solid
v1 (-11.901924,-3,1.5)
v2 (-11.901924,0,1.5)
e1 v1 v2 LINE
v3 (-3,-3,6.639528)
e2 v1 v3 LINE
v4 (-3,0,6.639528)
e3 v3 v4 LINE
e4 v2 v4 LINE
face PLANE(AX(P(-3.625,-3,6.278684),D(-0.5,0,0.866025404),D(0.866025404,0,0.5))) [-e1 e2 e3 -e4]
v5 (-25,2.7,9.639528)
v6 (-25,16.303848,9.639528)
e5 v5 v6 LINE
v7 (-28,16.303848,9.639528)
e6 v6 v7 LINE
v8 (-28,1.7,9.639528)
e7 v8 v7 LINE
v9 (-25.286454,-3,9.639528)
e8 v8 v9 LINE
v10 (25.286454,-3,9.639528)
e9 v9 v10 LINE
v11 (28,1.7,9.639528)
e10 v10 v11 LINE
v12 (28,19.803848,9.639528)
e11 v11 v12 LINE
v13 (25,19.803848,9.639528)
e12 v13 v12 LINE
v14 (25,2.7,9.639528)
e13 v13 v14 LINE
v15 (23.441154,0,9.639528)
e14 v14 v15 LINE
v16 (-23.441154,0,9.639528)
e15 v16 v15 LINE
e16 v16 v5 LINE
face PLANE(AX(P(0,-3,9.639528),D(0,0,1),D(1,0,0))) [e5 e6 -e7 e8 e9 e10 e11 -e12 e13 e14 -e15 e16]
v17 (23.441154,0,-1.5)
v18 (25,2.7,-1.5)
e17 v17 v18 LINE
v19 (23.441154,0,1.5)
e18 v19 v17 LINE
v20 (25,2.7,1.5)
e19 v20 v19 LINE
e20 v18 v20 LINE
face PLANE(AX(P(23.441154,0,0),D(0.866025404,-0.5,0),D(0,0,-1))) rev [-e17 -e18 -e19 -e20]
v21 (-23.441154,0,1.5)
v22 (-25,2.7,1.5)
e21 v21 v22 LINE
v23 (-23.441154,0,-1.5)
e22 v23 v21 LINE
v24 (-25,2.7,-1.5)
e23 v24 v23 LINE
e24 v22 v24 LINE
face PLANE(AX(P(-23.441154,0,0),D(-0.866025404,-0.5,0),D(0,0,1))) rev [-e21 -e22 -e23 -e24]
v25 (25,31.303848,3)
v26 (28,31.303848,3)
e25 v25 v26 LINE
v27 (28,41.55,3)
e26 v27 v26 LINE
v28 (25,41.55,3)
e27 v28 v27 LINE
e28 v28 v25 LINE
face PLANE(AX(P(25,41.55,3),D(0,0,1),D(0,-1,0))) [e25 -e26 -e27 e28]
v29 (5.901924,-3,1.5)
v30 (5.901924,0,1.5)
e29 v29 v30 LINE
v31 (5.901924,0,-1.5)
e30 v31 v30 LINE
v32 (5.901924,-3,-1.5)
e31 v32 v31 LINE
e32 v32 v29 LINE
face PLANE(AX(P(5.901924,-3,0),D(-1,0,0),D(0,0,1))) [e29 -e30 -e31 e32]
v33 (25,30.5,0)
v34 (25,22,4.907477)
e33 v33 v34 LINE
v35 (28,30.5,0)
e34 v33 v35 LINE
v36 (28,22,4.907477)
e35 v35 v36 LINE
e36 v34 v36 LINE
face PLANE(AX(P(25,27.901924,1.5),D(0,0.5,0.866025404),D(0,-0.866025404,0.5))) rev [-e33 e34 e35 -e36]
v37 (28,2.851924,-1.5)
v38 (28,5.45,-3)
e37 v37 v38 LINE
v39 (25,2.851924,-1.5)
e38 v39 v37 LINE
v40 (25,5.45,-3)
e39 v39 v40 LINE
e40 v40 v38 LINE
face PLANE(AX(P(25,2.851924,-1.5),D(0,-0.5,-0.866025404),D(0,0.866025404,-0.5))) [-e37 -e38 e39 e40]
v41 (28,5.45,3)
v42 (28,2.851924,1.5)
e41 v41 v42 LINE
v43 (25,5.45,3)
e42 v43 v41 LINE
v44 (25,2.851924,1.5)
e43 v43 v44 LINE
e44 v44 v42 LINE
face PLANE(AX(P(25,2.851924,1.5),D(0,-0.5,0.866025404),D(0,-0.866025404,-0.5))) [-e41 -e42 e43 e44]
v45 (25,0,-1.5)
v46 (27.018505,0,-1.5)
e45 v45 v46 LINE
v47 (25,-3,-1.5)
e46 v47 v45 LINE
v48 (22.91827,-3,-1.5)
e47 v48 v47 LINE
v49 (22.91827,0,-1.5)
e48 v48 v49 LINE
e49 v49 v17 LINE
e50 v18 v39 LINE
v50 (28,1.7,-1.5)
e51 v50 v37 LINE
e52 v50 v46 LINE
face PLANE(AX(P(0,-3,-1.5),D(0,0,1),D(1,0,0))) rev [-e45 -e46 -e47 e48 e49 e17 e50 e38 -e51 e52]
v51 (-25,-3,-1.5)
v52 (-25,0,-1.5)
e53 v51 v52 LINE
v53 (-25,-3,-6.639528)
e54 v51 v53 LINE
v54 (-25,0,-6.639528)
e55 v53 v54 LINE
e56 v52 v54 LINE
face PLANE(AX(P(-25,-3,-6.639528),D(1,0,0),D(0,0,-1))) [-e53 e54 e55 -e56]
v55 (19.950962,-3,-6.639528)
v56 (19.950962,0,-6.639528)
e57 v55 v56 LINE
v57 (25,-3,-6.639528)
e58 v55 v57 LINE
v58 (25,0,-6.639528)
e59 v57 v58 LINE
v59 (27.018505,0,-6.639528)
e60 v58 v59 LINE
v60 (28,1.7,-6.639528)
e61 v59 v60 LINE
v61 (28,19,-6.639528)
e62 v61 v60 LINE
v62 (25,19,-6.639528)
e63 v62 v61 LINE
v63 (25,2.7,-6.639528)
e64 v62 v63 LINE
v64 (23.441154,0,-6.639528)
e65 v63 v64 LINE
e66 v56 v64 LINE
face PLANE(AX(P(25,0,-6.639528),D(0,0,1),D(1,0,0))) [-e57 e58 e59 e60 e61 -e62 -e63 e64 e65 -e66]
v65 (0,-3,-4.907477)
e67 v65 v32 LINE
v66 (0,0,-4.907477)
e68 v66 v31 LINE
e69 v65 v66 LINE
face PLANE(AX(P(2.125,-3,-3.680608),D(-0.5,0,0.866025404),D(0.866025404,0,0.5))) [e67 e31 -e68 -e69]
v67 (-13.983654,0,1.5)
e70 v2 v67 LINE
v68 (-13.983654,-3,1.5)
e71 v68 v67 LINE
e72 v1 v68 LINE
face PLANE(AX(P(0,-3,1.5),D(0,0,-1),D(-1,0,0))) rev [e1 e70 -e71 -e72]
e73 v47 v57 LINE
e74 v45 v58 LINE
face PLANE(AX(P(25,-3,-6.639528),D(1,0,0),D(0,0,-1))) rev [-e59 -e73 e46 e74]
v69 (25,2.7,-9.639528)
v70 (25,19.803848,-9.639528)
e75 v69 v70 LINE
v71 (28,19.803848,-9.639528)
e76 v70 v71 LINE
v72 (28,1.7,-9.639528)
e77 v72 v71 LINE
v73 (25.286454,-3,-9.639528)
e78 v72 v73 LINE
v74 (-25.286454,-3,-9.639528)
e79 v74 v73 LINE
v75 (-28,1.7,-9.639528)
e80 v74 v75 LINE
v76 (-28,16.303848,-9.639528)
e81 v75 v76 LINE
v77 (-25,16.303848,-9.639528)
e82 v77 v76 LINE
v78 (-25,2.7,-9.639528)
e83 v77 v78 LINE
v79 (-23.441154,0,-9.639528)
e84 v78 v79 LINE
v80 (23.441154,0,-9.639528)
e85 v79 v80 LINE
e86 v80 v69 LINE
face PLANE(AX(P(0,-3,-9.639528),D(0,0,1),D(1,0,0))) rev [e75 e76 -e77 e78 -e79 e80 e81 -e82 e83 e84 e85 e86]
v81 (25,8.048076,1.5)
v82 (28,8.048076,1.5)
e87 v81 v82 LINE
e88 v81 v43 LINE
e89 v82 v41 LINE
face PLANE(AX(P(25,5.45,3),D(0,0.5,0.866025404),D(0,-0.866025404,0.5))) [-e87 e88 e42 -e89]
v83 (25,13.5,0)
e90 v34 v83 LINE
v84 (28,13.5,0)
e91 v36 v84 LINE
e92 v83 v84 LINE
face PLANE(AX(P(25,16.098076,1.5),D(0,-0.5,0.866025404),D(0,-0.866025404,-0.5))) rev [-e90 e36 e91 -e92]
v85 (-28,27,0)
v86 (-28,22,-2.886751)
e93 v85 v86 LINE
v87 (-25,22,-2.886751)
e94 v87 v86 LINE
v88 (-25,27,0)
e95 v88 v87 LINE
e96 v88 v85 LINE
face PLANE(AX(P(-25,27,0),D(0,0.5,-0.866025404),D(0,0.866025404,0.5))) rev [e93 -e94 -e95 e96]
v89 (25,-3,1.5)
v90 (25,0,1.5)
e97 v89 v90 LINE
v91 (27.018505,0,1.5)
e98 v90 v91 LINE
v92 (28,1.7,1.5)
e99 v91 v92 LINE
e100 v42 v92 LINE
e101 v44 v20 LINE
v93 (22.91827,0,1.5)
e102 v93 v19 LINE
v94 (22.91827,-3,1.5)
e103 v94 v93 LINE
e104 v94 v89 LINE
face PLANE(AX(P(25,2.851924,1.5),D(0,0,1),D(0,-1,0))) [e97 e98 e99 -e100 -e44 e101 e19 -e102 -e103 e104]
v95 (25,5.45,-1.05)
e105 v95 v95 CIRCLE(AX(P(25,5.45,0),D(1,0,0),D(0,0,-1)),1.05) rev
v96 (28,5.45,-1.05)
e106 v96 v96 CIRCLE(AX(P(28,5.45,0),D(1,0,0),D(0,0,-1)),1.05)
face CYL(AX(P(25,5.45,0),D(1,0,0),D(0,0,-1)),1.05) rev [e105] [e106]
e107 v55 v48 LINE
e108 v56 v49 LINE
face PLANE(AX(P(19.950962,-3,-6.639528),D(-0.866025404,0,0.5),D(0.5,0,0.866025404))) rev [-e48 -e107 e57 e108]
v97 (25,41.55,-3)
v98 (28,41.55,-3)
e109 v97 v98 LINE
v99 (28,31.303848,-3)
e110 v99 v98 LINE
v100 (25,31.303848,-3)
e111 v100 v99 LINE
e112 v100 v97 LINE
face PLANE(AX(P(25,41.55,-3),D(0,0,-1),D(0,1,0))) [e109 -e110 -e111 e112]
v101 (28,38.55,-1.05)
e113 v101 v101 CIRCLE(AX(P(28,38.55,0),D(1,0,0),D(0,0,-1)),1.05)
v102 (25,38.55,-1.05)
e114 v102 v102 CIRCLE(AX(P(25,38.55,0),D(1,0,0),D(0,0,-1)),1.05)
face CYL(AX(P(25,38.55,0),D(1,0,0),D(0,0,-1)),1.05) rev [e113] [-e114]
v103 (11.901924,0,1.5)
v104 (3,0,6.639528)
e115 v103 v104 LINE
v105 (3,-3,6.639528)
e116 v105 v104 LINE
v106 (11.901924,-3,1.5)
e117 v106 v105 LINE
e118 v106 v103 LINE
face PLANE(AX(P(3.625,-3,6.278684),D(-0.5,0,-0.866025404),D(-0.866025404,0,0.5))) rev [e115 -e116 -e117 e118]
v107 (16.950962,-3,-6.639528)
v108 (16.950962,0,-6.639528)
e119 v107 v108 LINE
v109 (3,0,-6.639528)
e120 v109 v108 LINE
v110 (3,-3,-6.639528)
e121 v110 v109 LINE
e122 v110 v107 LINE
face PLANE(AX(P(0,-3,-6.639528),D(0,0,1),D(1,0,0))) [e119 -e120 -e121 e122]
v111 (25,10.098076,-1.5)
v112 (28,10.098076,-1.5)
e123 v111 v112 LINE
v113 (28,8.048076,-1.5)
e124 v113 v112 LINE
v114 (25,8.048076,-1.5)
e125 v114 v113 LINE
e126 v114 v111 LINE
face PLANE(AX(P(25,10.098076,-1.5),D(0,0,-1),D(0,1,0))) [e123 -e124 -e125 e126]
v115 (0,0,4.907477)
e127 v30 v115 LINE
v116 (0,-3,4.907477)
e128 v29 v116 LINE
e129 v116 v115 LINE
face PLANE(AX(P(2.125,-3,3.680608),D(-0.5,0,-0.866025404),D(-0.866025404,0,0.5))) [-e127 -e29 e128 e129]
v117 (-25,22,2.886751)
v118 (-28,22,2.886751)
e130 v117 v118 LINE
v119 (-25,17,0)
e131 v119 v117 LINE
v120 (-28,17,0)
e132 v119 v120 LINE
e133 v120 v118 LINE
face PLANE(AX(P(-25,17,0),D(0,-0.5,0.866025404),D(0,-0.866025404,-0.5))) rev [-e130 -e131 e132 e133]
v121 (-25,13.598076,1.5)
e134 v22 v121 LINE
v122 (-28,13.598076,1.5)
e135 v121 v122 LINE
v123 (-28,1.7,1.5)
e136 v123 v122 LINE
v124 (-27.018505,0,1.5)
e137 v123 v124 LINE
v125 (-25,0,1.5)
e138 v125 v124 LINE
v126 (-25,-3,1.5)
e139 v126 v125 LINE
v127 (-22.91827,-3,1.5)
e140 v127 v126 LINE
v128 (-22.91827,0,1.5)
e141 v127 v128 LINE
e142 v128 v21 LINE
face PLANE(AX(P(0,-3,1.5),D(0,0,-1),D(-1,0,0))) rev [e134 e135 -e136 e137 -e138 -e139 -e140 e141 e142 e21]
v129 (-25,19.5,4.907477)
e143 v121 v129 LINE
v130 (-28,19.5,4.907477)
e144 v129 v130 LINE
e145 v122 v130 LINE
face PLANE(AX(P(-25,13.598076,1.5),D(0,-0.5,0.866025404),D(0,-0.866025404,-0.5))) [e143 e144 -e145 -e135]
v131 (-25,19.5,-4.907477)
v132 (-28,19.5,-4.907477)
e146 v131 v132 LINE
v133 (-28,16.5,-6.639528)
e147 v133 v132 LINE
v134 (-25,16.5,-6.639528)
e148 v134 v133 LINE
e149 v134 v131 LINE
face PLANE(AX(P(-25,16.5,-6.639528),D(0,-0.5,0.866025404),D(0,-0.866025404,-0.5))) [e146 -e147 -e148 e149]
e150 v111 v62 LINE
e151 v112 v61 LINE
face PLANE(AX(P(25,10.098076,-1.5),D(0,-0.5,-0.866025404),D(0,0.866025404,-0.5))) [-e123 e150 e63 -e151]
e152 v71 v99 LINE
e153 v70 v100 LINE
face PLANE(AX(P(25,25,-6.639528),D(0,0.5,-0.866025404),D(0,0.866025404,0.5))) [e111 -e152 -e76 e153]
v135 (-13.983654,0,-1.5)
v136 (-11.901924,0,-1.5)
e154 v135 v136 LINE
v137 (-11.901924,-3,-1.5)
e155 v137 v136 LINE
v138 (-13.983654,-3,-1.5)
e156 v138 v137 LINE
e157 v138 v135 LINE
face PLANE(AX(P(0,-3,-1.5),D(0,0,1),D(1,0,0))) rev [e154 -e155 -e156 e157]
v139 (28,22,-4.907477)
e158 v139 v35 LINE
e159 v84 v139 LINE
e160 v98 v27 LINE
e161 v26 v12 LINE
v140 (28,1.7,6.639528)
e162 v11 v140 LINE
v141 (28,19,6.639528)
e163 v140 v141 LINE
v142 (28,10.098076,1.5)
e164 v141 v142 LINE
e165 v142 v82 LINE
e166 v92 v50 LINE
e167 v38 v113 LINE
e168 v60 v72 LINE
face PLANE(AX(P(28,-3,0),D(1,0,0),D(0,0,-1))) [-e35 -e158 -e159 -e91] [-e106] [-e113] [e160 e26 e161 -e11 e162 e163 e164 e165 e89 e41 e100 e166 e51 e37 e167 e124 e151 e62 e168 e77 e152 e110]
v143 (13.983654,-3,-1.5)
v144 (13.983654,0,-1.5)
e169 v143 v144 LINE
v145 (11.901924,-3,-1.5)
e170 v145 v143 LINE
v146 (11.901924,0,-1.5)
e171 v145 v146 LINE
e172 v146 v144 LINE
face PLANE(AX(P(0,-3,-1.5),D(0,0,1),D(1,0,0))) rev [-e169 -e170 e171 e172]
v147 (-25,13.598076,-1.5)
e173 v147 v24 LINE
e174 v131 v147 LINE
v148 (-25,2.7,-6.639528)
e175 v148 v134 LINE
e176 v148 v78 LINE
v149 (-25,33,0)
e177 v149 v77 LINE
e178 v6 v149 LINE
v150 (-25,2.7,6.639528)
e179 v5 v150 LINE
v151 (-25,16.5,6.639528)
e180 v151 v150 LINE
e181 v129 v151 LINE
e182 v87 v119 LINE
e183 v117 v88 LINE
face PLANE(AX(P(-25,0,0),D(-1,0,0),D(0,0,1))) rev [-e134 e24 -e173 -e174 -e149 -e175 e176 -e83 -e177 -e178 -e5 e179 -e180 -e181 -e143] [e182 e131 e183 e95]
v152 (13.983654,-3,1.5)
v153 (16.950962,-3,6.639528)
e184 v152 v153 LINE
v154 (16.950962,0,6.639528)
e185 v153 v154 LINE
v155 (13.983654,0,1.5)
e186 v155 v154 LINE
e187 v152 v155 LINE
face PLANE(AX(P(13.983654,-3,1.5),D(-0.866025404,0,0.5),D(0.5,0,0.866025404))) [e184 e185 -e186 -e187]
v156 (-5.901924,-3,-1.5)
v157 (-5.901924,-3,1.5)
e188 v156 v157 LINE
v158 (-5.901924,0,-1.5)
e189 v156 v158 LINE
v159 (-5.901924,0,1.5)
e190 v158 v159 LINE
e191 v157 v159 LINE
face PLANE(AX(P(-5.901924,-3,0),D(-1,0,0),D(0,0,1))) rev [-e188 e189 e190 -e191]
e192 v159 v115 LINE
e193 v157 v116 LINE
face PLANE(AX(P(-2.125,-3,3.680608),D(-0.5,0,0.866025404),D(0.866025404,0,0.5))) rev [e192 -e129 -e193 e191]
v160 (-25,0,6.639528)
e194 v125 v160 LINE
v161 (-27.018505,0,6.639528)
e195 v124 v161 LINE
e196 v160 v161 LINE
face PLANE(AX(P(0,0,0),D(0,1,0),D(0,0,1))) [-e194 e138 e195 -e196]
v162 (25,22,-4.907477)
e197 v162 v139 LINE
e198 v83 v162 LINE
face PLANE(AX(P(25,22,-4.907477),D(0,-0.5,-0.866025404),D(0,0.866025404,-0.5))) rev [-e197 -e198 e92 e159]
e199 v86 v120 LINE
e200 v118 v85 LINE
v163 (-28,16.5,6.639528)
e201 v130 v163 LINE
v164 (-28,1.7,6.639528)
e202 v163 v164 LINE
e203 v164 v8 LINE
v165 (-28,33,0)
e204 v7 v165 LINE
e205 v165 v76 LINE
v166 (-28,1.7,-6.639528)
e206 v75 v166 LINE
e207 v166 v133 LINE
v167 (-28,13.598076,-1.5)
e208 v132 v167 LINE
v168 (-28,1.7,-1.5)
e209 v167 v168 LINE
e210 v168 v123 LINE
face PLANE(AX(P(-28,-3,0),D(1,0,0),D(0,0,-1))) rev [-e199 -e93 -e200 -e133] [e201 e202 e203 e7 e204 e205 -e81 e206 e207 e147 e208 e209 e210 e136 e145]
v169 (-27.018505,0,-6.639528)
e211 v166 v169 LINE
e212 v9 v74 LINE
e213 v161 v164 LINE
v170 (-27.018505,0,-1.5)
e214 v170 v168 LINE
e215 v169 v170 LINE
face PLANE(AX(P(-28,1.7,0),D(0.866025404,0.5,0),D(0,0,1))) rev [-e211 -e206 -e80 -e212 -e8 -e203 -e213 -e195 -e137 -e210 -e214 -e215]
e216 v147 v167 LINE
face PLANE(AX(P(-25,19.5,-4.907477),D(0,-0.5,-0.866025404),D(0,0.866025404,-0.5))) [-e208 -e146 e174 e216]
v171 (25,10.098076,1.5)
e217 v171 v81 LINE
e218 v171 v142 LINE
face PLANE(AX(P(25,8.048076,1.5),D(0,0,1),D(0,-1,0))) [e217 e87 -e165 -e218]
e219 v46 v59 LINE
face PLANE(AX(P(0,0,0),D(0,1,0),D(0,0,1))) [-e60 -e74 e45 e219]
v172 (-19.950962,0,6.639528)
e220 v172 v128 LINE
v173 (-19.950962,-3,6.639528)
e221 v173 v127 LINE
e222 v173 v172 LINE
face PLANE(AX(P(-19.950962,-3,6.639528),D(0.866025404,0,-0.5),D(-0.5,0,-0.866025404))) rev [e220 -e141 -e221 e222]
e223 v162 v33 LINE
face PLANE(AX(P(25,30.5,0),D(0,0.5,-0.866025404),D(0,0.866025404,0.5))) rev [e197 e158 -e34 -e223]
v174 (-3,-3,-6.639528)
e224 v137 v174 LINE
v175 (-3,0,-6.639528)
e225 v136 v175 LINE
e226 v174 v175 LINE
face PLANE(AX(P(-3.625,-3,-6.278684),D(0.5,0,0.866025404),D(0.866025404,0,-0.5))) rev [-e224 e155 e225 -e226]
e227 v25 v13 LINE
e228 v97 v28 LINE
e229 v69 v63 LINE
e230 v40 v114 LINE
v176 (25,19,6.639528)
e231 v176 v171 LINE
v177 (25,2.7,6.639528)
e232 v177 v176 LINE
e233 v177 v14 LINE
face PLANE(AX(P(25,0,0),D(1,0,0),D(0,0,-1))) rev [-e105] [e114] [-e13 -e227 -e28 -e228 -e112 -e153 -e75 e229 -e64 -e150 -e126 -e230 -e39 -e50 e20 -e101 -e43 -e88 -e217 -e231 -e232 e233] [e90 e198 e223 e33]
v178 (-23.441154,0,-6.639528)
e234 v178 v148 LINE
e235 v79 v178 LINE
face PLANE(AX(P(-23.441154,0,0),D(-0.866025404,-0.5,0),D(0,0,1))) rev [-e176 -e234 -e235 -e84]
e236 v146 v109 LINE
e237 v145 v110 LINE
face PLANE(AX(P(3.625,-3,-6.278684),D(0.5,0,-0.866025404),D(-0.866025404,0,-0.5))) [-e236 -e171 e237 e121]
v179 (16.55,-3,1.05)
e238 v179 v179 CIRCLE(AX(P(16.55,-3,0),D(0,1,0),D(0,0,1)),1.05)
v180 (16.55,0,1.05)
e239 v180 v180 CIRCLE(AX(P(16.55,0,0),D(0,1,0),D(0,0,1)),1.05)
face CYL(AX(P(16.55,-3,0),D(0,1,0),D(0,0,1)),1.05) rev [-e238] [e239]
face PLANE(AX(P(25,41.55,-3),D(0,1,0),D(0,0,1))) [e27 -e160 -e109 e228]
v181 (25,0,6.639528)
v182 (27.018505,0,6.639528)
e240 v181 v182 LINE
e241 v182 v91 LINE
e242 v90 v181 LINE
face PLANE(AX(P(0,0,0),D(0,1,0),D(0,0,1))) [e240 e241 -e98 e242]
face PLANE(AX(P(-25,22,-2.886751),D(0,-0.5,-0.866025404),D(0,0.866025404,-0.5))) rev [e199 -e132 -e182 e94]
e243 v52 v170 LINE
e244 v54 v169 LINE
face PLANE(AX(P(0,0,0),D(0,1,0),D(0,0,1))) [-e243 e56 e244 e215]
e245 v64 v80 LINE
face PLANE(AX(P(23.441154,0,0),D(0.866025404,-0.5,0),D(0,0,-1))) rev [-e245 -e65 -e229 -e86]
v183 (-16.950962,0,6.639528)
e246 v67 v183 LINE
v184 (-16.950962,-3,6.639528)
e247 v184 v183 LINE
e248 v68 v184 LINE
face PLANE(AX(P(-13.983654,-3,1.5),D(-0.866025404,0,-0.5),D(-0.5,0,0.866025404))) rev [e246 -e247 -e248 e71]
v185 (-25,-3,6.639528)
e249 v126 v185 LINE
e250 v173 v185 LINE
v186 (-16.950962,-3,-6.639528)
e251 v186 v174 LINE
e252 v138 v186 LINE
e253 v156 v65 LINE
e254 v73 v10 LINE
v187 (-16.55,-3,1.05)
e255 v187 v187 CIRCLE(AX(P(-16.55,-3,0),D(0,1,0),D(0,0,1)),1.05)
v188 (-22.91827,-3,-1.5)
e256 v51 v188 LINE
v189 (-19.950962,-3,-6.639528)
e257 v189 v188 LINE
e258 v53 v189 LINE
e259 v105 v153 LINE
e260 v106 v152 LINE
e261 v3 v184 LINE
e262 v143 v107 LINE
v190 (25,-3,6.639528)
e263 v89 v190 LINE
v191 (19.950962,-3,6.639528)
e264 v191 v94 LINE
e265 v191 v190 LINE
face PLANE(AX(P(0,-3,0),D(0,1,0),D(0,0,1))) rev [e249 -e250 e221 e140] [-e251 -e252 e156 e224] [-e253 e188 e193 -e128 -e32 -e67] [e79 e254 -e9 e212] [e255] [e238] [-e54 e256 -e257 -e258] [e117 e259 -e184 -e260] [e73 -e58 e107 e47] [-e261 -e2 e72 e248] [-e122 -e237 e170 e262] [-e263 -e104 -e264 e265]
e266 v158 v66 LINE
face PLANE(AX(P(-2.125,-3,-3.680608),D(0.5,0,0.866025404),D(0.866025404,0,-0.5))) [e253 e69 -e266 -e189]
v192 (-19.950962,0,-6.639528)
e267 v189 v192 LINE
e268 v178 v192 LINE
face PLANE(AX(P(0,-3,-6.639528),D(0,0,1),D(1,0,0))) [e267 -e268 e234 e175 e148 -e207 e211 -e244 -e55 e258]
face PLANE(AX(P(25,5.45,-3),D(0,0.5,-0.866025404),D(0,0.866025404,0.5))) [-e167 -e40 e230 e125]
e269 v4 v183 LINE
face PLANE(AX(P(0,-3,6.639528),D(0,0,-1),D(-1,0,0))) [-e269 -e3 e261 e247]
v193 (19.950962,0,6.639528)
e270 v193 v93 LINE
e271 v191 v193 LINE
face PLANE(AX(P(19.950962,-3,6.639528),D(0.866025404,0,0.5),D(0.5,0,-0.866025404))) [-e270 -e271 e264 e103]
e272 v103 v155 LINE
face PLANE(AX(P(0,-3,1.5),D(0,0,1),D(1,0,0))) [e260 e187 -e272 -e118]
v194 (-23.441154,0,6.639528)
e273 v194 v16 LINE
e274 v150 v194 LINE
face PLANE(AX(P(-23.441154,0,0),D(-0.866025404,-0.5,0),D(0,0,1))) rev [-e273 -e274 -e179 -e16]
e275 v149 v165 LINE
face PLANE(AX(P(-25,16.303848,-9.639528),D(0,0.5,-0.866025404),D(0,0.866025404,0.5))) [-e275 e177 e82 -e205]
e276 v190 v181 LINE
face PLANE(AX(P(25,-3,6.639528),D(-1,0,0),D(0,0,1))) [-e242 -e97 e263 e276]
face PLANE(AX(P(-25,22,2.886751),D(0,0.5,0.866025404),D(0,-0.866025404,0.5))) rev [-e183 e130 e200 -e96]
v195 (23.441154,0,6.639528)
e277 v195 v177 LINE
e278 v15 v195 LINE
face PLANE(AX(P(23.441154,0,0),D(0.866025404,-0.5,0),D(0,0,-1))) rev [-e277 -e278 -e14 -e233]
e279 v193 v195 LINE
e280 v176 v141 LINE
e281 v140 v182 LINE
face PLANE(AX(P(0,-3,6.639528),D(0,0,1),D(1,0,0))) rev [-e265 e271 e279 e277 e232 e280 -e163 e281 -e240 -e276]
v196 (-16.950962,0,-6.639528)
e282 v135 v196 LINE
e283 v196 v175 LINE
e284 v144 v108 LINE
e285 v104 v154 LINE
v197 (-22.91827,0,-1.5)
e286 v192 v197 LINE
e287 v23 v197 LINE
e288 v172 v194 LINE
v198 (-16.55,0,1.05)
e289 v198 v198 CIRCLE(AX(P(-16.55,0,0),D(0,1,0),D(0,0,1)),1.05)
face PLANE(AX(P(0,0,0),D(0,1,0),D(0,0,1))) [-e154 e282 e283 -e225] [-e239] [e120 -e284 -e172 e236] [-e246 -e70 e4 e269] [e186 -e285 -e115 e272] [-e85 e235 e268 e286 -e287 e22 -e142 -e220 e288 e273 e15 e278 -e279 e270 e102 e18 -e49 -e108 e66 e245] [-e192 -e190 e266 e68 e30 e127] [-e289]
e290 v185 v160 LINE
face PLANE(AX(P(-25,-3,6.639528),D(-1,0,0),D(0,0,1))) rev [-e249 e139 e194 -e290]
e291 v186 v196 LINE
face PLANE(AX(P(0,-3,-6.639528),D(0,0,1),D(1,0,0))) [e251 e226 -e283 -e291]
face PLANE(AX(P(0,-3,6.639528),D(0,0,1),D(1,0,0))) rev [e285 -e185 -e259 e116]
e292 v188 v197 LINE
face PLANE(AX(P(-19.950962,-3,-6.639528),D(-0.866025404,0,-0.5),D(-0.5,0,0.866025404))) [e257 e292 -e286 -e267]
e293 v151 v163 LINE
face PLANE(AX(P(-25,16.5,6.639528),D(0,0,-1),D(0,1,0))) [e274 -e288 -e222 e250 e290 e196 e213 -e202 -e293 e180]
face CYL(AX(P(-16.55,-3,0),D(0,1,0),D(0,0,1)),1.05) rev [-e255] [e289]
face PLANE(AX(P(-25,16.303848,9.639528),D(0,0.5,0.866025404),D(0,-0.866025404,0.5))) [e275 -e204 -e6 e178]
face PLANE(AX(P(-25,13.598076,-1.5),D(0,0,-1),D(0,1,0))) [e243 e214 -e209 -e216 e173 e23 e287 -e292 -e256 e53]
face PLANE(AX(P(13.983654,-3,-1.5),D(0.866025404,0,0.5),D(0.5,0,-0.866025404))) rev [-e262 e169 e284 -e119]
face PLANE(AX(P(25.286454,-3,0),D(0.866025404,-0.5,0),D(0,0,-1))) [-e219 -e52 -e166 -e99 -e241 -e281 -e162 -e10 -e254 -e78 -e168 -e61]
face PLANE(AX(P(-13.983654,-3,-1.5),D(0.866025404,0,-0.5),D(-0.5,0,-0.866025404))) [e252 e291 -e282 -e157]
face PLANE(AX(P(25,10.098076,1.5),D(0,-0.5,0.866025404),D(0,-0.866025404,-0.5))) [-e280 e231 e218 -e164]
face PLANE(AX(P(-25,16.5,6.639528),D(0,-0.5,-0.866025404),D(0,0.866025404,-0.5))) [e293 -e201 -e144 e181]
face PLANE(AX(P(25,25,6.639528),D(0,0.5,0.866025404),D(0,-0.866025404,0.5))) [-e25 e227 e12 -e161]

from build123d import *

# Parameters (mm, degrees)
SKETCH1_R               = 1.05
BOSS_EXTRUDE1_DEPTH     = 3
SKETCH4_W               = 3
SKETCH4_H               = 5.139528096
BOSS_EXTRUDE5_DEPTH     = 3
MIRROR3_COPY_1_SKETCH_W = 3
MIRROR3_COPY_1_SKETCH_H = 5.139528096
MIRROR3_COPY_1_DEPTH    = 3
SKETCH5_R               = 1.05
BOSS_EXTRUDE6_DEPTH     = 3
CHAMFER2_SIZE           = 10
CHAMFER2_SIZE_2         = 5.773502692
BOSS_EXTRUDE8_DEPTH     = 3
CUT_EXTRUDE3_DEPTH      = 19.279056191
CHAMFER4_SIZE           = 2.7
CHAMFER4_SIZE_2         = 1.558845727
CHAMFER5_SIZE           = 2.713546265
CHAMFER5_SIZE_2         = 4.7


with BuildPart() as part:
    # Sketch1 → Boss-Extrude1 (new body)
    with BuildSketch(Plane(origin=(0, 0, 0), x_dir=(1, 0, 0), z_dir=(0, 1, 0))):
        Polygon((-28, -1.5), (-28, 1.5), (-11.901923789, 1.5), (-3, 6.639528096), (-28, 6.639528096), (-28, 9.639528096), (28, 9.639528096), (28, 6.639528096), (3, 6.639528096), (11.901923789, 1.5), (28, 1.5), (28, -1.5), (11.901923789, -1.5), (3, -6.639528096), (28, -6.639528096), (28, -9.639528096), (-28, -9.639528096), (-28, -6.639528096), (-3, -6.639528096), (-11.901923789, -1.5), align=None)
        with Locations(Location((-16.55, 0, 0), (0, 0, 270))):
            Circle(SKETCH1_R, mode=Mode.SUBTRACT)
        with Locations(Location((16.55, 0, 0), (0, 0, 270))):
            Circle(SKETCH1_R, mode=Mode.SUBTRACT)
        Polygon((-5.901923789, 1.5), (0, 4.907477288), (5.901923789, 1.5), (5.901923789, -1.5), (0, -4.907477288), (-5.901923789, -1.5), align=None, mode=Mode.SUBTRACT)
    extrude(amount=-BOSS_EXTRUDE1_DEPTH)

    # Sketch4 → Boss-Extrude5 (add)
    with BuildSketch(Plane(origin=(0, 0, 0), x_dir=(1, 0, 0), z_dir=(0, 1, 0))):
        with Locations((-26.5, 4.069764048)):
            Rectangle(SKETCH4_W, SKETCH4_H)
        Polygon((-13.983653965, 1.5), (-16.950961894, 6.639528096), (-19.950961894, 6.639528096), (-22.918269824, 1.5), align=None)
    boss_extrude5 = extrude(amount=-BOSS_EXTRUDE5_DEPTH)

    # Mirror2: Boss-Extrude5 across plane
    add(boss_extrude5.mirror(Plane.XY))

    # Mirror3: Boss-Extrude5 across plane
    add(boss_extrude5.mirror(Plane(origin=(0, 0, 0), x_dir=(0, 0, 1), z_dir=(1, 0, 0))))

    # Mirror3 copy 1 sketch → Mirror3 copy 1 (add)
    with BuildSketch(Plane(origin=(0, 0, 0), x_dir=(-1, 0, 0), z_dir=(0, 1, 0))):
        with Locations((-26.5, 4.069764048)):
            Rectangle(MIRROR3_COPY_1_SKETCH_W, MIRROR3_COPY_1_SKETCH_H)
        Polygon((-13.983653965, 1.5), (-16.950961894, 6.639528096), (-19.950961894, 6.639528096), (-22.918269824, 1.5), align=None)
    extrude(amount=-MIRROR3_COPY_1_DEPTH)

    # Sketch5 → Boss-Extrude6 (add)
    with BuildSketch(Plane(origin=(28, 0, 0), x_dir=(0, 0, -1), z_dir=(1, 0, 0))):
        Polygon((-1.5, 0), (1.5, 0), (1.5, 2.851923789), (3, 5.45), (1.5, 8.048076211), (1.5, 10.098076211), (6.639528096, 19), (6.639528096, 0), (9.639528096, 0), (9.639528096, 19.803847577), (6.639528096, 25), (3, 31.303847577), (3, 41.55), (-3, 41.55), (-3, 31.303847577), (-6.639528096, 25), (-9.639528096, 19.803847577), (-9.639528096, 0), (-6.639528096, 0), (-6.639528096, 19), (-1.5, 10.098076211), (-1.5, 8.048076211), (-3, 5.45), (-1.5, 2.851923789), align=None)
        with Locations((0, 38.55)):
            Circle(SKETCH5_R, mode=Mode.SUBTRACT)
        with Locations((0, 5.45)):
            Circle(SKETCH5_R, mode=Mode.SUBTRACT)
        Polygon((-1.5, 27.901923789), (-4.907477288, 22), (-1.5, 16.098076211), (0, 13.5), (1.5, 16.098076211), (4.907477288, 22), (1.5, 27.901923789), (0, 30.5), align=None, mode=Mode.SUBTRACT)
    extrude(amount=-BOSS_EXTRUDE6_DEPTH)

    # Chamfer2
    # the kernel refuses this chamfer: 10, 5.773502692 mm, written as the material it adds along each edge
    with BuildSketch(Plane(origin=(25, 0, 19.231329451), x_dir=(0.019326765612700636, 0.9998132206222079, 0), z_dir=(0, 0, -1))) as chamfer2_piece_1_section:
        Polygon((CHAMFER2_SIZE * 0.999813220622, -CHAMFER2_SIZE * 0.0193267656127), (-CHAMFER2_SIZE_2 * 0.0193267656124, -CHAMFER2_SIZE_2 * 0.999813220604), (0, 0), align=None)
    chamfer2_piece_1 = extrude(amount=54.741715093, mode=Mode.PRIVATE)
    chamfer2_piece_1 = split(chamfer2_piece_1, bisect_by=Plane(origin=(23.083170395, 3.339976868, 9.639528096), z_dir=(0, 0, -1)), keep=Keep.TOP, mode=Mode.PRIVATE)
    chamfer2_piece_1 = split(chamfer2_piece_1, bisect_by=Plane(origin=(23.083170395, 3.339976868, 6.639528096), z_dir=(0, 0, 1)), keep=Keep.TOP, mode=Mode.PRIVATE)
    add(chamfer2_piece_1)
    with BuildSketch(Plane(origin=(25, 0, 19.231329451), x_dir=(0.019326765612700636, 0.9998132206222079, 0), z_dir=(0, 0, -1))) as chamfer2_piece_2_section:
        Polygon((CHAMFER2_SIZE * 0.999813220622, -CHAMFER2_SIZE * 0.0193267656127), (-CHAMFER2_SIZE_2 * 0.0193267656124, -CHAMFER2_SIZE_2 * 0.999813220604), (0, 0), align=None)
    chamfer2_piece_2 = extrude(amount=54.741715093, mode=Mode.PRIVATE)
    chamfer2_piece_2 = chamfer2_piece_2 - Plane(origin=(20.16592145, 5.45, 0), x_dir=(0, 0, -1), z_dir=(1, 0, 0)) * Cylinder(1.05, 150, mode=Mode.PRIVATE)
    chamfer2_piece_2 = split(chamfer2_piece_2, bisect_by=Plane(origin=(20.36501826, 1.167335957, 5.922361434), z_dir=(-0.8660254037844365, 0, -0.5000000000000038)), keep=Keep.TOP, mode=Mode.PRIVATE)
    chamfer2_piece_2 = split(chamfer2_piece_2, bisect_by=Plane(origin=(20.16592145, 1.167335957, -1.5), z_dir=(0, 0, 1)), keep=Keep.TOP, mode=Mode.PRIVATE)
    add(chamfer2_piece_2)
    with BuildSketch(Plane(origin=(25, 0, 19.231329451), x_dir=(0.019326765612700636, 0.9998132206222079, 0), z_dir=(0, 0, -1))) as chamfer2_piece_3_section:
        Polygon((CHAMFER2_SIZE * 0.999813220622, -CHAMFER2_SIZE * 0.0193267656127), (-CHAMFER2_SIZE_2 * 0.0193267656124, -CHAMFER2_SIZE_2 * 0.999813220604), (0, 0), align=None)
    chamfer2_piece_3 = extrude(amount=54.741715093, mode=Mode.PRIVATE)
    chamfer2_piece_3 = chamfer2_piece_3 - Plane(origin=(24.384879917, 5.45, 0), x_dir=(0, 0, -1), z_dir=(1, 0, 0)) * Cylinder(1.05, 150, mode=Mode.PRIVATE)
    chamfer2_piece_3 = split(chamfer2_piece_3, bisect_by=Plane(origin=(24.384879917, 8.598015425, 1.5), z_dir=(0, 0, -1)), keep=Keep.TOP, mode=Mode.PRIVATE)
    chamfer2_piece_3 = split(chamfer2_piece_3, bisect_by=Plane(origin=(24.384879917, 8.598015425, -1.5), z_dir=(0, 0, 1)), keep=Keep.TOP, mode=Mode.PRIVATE)
    add(chamfer2_piece_3)
    with BuildSketch(Plane(origin=(25, 0, 19.231329451), x_dir=(0.019326765612700636, 0.9998132206222079, 0), z_dir=(0, 0, -1))) as chamfer2_piece_4_section:
        Polygon((CHAMFER2_SIZE * 0.999813220622, -CHAMFER2_SIZE * 0.0193267656127), (-CHAMFER2_SIZE_2 * 0.0193267656124, -CHAMFER2_SIZE_2 * 0.999813220604), (0, 0), align=None)
    chamfer2_piece_4 = extrude(amount=54.741715093, mode=Mode.PRIVATE)
    chamfer2_piece_4 = split(chamfer2_piece_4, bisect_by=Plane(origin=(22.219816408, 4.29897732, -1.5), z_dir=(0, 0, -1)), keep=Keep.TOP, mode=Mode.PRIVATE)
    chamfer2_piece_4 = split(chamfer2_piece_4, bisect_by=Plane(origin=(22.603293948, 4.29897732, -2.04555422), z_dir=(-0.8660254037844365, 0, 0.5000000000000038)), keep=Keep.TOP, mode=Mode.PRIVATE)
    add(chamfer2_piece_4)
    with BuildSketch(Plane(origin=(25, 0, -6.639528096), x_dir=(0.019326765612700636, 0.9998132206222079, 0), z_dir=(0, 0, -1))) as chamfer2_piece_5:
        Polygon((CHAMFER2_SIZE * 0.999813220622, -CHAMFER2_SIZE * 0.0193267656127), (-CHAMFER2_SIZE_2 * 0.0193267656124, -CHAMFER2_SIZE_2 * 0.999813220604), (0, 0), align=None)
    extrude(amount=3)

    # Sketch8 → Boss-Extrude8 (add)
    with BuildSketch(Plane.ZY.offset(28)):
        Polygon((0, 33), (-6.350852961, 22), (-9.639528096, 16.303847577), (-9.639528096, 0), (-6.639528096, 0), (-6.639528096, 16.5), (-4.907477288, 19.5), (-1.5, 13.598076211), (-1.5, 0), (1.5, 0), (1.5, 13.598076211), (4.907477288, 19.5), (6.639528096, 16.5), (6.639528096, 0), (9.639528096, 0), (9.639528096, 16.303847577), (6.350852961, 22), align=None)
        Polygon((0, 17), (2.886751346, 22), (0, 27), (-2.886751346, 22), align=None, mode=Mode.SUBTRACT)
    extrude(amount=-BOSS_EXTRUDE8_DEPTH)

    # Sketch11 → Cut-Extrude3 (cut)
    with BuildSketch(Plane(origin=(0, 0, -9.639528096), x_dir=(-1, 0, 0), z_dir=(0, 0, -1))):
        Polygon((-19.226497308, 0), (-25, 0), (-25, 10), align=None)
    extrude(amount=-CUT_EXTRUDE3_DEPTH, mode=Mode.SUBTRACT)

    # Chamfer4
    # the kernel refuses this chamfer: 2.7, 1.558845727 mm, written as the material it adds along each edge
    with BuildSketch(Plane(origin=(-25, 0, -0.345603442), x_dir=(-0.019326765612700168, 0.9998132206222078, 0), z_dir=(0, 0, 1))) as chamfer4_piece_1_section:
        Polygon((CHAMFER4_SIZE * 0.999813220622, -CHAMFER4_SIZE * 0.0193267656127), (-CHAMFER4_SIZE_2 * 0.0193267656104, -CHAMFER4_SIZE_2 * 0.999813220502), (0, 0), align=None)
    chamfer4_piece_1 = extrude(amount=9.985131538, mode=Mode.PRIVATE)
    chamfer4_piece_1 = split(chamfer4_piece_1, bisect_by=Plane(origin=(-24.500125104, 0.905532133, 1.5), z_dir=(0, 0, -1)), keep=Keep.TOP, mode=Mode.PRIVATE)
    add(chamfer4_piece_1)
    with BuildSketch(Plane(origin=(-25, 0, 6.639528096), x_dir=(-0.019326765612700168, 0.9998132206222078, 0), z_dir=(0, 0, 1)), Plane(origin=(-25, 0, -1.5), x_dir=(-0.019326765612700168, 0.9998132206222078, 0), z_dir=(0, 0, 1)), Plane(origin=(-25, 0, -9.639528096), x_dir=(-0.019326765612701444, 0.9998132206222078, 0), z_dir=(0, 0, 1))) as chamfer4_piece_2:
        Polygon((CHAMFER4_SIZE * 0.999813220622, -CHAMFER4_SIZE * 0.0193267656127), (-CHAMFER4_SIZE_2 * 0.0193267656104, -CHAMFER4_SIZE_2 * 0.999813220502), (0, 0), align=None)
    extrude(amount=3)
    with BuildSketch(Plane(origin=(-25, 0, -8.485131538), x_dir=(-0.019326765612700168, 0.9998132206222078, 0), z_dir=(0, 0, 1))) as chamfer4_piece_3_section:
        Polygon((CHAMFER4_SIZE * 0.999813220622, -CHAMFER4_SIZE * 0.0193267656127), (-CHAMFER4_SIZE_2 * 0.0193267656104, -CHAMFER4_SIZE_2 * 0.999813220502), (0, 0), align=None)
    chamfer4_piece_3 = extrude(amount=9.985131538, mode=Mode.PRIVATE)
    chamfer4_piece_3 = split(chamfer4_piece_3, bisect_by=Plane(origin=(-24.500125104, 0.905532133, -6.639528096), z_dir=(0, 0, -1)), keep=Keep.TOP, mode=Mode.PRIVATE)
    add(chamfer4_piece_3)
    with BuildSketch(Plane(origin=(-25, 0, -1.5), x_dir=(-0.019326765612700168, 0.9998132206222078, 0), z_dir=(0, 0, 1))) as chamfer4_piece_4_section:
        Polygon((CHAMFER4_SIZE * 0.999813220622, -CHAMFER4_SIZE * 0.0193267656127), (-CHAMFER4_SIZE_2 * 0.0193267656104, -CHAMFER4_SIZE_2 * 0.999813220502), (0, 0), align=None)
    chamfer4_piece_4 = extrude(amount=9.985131538, mode=Mode.PRIVATE)
    chamfer4_piece_4 = split(chamfer4_piece_4, bisect_by=Plane(origin=(-24.500125104, 0.905532133, 6.639528096), z_dir=(0, 0, 1)), keep=Keep.TOP, mode=Mode.PRIVATE)
    add(chamfer4_piece_4)
    with BuildSketch(Plane(origin=(-25, 0, -9.639528096), x_dir=(-0.019326765612701444, 0.9998132206222078, 0), z_dir=(0, 0, 1))) as chamfer4_piece_5_section:
        Polygon((CHAMFER4_SIZE * 0.999813220622, -CHAMFER4_SIZE * 0.0193267656127), (-CHAMFER4_SIZE_2 * 0.0193267656104, -CHAMFER4_SIZE_2 * 0.999813220502), (0, 0), align=None)
    chamfer4_piece_5 = extrude(amount=9.985131538, mode=Mode.PRIVATE)
    chamfer4_piece_5 = split(chamfer4_piece_5, bisect_by=Plane(origin=(-24.500125104, 0.905532133, -1.5), z_dir=(0, 0, 1)), keep=Keep.TOP, mode=Mode.PRIVATE)
    add(chamfer4_piece_5)
    with BuildSketch(Plane(origin=(25, 0, -0.345603442), x_dir=(0.019326765612700168, 0.9998132206222078, 0), z_dir=(0, 0, 1))) as chamfer4_piece_6_section:
        Polygon((CHAMFER4_SIZE * 0.999813220622, CHAMFER4_SIZE * 0.0193267656127), (-CHAMFER4_SIZE_2 * 0.0193267656104, CHAMFER4_SIZE_2 * 0.999813220502), (0, 0), align=None)
    chamfer4_piece_6 = extrude(amount=9.985131537, mode=Mode.PRIVATE)
    chamfer4_piece_6 = split(chamfer4_piece_6, bisect_by=Plane(origin=(24.500125104, 0.905532133, 1.5), z_dir=(0, 0, -1)), keep=Keep.TOP, mode=Mode.PRIVATE)
    add(chamfer4_piece_6)
    with BuildSketch(Plane(origin=(25, 0, 6.639528096), x_dir=(0.01932676561269762, 0.999813220622208, 0), z_dir=(0, 0, 1)), Plane(origin=(25, 0, -1.5), x_dir=(0.01932676561269762, 0.999813220622208, 0), z_dir=(0, 0, 1)), Plane(origin=(25, 0, -9.639528096), x_dir=(0.019326765612698894, 0.999813220622208, 0), z_dir=(0, 0, 1))) as chamfer4_piece_7:
        Polygon((CHAMFER4_SIZE * 0.999813220622, CHAMFER4_SIZE * 0.0193267656127), (-CHAMFER4_SIZE_2 * 0.0193267656104, CHAMFER4_SIZE_2 * 0.999813220502), (0, 0), align=None)
    extrude(amount=3)
    with BuildSketch(Plane(origin=(25, 0, -8.485131538), x_dir=(0.019326765612700168, 0.9998132206222078, 0), z_dir=(0, 0, 1))) as chamfer4_piece_8_section:
        Polygon((CHAMFER4_SIZE * 0.999813220622, CHAMFER4_SIZE * 0.0193267656127), (-CHAMFER4_SIZE_2 * 0.0193267656104, CHAMFER4_SIZE_2 * 0.999813220502), (0, 0), align=None)
    chamfer4_piece_8 = extrude(amount=9.985131538, mode=Mode.PRIVATE)
    chamfer4_piece_8 = split(chamfer4_piece_8, bisect_by=Plane(origin=(24.500125104, 0.905532133, -6.639528096), z_dir=(0, 0, -1)), keep=Keep.TOP, mode=Mode.PRIVATE)
    add(chamfer4_piece_8)
    with BuildSketch(Plane(origin=(25, 0, -1.5), x_dir=(0.01932676561269762, 0.999813220622208, 0), z_dir=(0, 0, 1))) as chamfer4_piece_9_section:
        Polygon((CHAMFER4_SIZE * 0.999813220622, CHAMFER4_SIZE * 0.0193267656127), (-CHAMFER4_SIZE_2 * 0.0193267656104, CHAMFER4_SIZE_2 * 0.999813220502), (0, 0), align=None)
    chamfer4_piece_9 = extrude(amount=9.985131538, mode=Mode.PRIVATE)
    chamfer4_piece_9 = split(chamfer4_piece_9, bisect_by=Plane(origin=(24.500125104, 0.905532133, 6.639528096), z_dir=(0, 0, 1)), keep=Keep.TOP, mode=Mode.PRIVATE)
    add(chamfer4_piece_9)
    with BuildSketch(Plane(origin=(25, 0, -9.639528096), x_dir=(0.019326765612698894, 0.999813220622208, 0), z_dir=(0, 0, 1))) as chamfer4_piece_10_section:
        Polygon((CHAMFER4_SIZE * 0.999813220622, CHAMFER4_SIZE * 0.0193267656127), (-CHAMFER4_SIZE_2 * 0.0193267656104, CHAMFER4_SIZE_2 * 0.999813220502), (0, 0), align=None)
    chamfer4_piece_10 = extrude(amount=9.985131538, mode=Mode.PRIVATE)
    chamfer4_piece_10 = split(chamfer4_piece_10, bisect_by=Plane(origin=(24.500125104, 0.905532133, -1.5), z_dir=(0, 0, 1)), keep=Keep.TOP, mode=Mode.PRIVATE)
    add(chamfer4_piece_10)

    # Chamfer5
    # the kernel refuses this chamfer: 4.7, 2.713546265 mm, written as the material it takes off along each edge
    with BuildSketch(Plane(origin=(28, -3, -21.798831143), x_dir=(-0.9983227437537925, -0.0578938624026708, 0), z_dir=(0, 0, 1))) as chamfer5_piece_1:
        Polygon((CHAMFER5_SIZE * 0.998322743824, -CHAMFER5_SIZE * 0.0578938624068), (-CHAMFER5_SIZE_2 * 0.0578938624027, -CHAMFER5_SIZE_2 * 0.998322743754), (0, 0), align=None)
    extrude(amount=43.597662285, mode=Mode.SUBTRACT)
    with BuildSketch(Plane(origin=(-28, -3, -21.798831143), x_dir=(0.9983227437537925, -0.0578938624026708, 0), z_dir=(0, 0, 1))) as chamfer5_piece_2:
        Polygon((CHAMFER5_SIZE * 0.998322743824, CHAMFER5_SIZE * 0.0578938624068), (-CHAMFER5_SIZE_2 * 0.0578938624027, CHAMFER5_SIZE_2 * 0.998322743754), (0, 0), align=None)
    extrude(amount=43.597662285, mode=Mode.SUBTRACT)


solid = part.part
